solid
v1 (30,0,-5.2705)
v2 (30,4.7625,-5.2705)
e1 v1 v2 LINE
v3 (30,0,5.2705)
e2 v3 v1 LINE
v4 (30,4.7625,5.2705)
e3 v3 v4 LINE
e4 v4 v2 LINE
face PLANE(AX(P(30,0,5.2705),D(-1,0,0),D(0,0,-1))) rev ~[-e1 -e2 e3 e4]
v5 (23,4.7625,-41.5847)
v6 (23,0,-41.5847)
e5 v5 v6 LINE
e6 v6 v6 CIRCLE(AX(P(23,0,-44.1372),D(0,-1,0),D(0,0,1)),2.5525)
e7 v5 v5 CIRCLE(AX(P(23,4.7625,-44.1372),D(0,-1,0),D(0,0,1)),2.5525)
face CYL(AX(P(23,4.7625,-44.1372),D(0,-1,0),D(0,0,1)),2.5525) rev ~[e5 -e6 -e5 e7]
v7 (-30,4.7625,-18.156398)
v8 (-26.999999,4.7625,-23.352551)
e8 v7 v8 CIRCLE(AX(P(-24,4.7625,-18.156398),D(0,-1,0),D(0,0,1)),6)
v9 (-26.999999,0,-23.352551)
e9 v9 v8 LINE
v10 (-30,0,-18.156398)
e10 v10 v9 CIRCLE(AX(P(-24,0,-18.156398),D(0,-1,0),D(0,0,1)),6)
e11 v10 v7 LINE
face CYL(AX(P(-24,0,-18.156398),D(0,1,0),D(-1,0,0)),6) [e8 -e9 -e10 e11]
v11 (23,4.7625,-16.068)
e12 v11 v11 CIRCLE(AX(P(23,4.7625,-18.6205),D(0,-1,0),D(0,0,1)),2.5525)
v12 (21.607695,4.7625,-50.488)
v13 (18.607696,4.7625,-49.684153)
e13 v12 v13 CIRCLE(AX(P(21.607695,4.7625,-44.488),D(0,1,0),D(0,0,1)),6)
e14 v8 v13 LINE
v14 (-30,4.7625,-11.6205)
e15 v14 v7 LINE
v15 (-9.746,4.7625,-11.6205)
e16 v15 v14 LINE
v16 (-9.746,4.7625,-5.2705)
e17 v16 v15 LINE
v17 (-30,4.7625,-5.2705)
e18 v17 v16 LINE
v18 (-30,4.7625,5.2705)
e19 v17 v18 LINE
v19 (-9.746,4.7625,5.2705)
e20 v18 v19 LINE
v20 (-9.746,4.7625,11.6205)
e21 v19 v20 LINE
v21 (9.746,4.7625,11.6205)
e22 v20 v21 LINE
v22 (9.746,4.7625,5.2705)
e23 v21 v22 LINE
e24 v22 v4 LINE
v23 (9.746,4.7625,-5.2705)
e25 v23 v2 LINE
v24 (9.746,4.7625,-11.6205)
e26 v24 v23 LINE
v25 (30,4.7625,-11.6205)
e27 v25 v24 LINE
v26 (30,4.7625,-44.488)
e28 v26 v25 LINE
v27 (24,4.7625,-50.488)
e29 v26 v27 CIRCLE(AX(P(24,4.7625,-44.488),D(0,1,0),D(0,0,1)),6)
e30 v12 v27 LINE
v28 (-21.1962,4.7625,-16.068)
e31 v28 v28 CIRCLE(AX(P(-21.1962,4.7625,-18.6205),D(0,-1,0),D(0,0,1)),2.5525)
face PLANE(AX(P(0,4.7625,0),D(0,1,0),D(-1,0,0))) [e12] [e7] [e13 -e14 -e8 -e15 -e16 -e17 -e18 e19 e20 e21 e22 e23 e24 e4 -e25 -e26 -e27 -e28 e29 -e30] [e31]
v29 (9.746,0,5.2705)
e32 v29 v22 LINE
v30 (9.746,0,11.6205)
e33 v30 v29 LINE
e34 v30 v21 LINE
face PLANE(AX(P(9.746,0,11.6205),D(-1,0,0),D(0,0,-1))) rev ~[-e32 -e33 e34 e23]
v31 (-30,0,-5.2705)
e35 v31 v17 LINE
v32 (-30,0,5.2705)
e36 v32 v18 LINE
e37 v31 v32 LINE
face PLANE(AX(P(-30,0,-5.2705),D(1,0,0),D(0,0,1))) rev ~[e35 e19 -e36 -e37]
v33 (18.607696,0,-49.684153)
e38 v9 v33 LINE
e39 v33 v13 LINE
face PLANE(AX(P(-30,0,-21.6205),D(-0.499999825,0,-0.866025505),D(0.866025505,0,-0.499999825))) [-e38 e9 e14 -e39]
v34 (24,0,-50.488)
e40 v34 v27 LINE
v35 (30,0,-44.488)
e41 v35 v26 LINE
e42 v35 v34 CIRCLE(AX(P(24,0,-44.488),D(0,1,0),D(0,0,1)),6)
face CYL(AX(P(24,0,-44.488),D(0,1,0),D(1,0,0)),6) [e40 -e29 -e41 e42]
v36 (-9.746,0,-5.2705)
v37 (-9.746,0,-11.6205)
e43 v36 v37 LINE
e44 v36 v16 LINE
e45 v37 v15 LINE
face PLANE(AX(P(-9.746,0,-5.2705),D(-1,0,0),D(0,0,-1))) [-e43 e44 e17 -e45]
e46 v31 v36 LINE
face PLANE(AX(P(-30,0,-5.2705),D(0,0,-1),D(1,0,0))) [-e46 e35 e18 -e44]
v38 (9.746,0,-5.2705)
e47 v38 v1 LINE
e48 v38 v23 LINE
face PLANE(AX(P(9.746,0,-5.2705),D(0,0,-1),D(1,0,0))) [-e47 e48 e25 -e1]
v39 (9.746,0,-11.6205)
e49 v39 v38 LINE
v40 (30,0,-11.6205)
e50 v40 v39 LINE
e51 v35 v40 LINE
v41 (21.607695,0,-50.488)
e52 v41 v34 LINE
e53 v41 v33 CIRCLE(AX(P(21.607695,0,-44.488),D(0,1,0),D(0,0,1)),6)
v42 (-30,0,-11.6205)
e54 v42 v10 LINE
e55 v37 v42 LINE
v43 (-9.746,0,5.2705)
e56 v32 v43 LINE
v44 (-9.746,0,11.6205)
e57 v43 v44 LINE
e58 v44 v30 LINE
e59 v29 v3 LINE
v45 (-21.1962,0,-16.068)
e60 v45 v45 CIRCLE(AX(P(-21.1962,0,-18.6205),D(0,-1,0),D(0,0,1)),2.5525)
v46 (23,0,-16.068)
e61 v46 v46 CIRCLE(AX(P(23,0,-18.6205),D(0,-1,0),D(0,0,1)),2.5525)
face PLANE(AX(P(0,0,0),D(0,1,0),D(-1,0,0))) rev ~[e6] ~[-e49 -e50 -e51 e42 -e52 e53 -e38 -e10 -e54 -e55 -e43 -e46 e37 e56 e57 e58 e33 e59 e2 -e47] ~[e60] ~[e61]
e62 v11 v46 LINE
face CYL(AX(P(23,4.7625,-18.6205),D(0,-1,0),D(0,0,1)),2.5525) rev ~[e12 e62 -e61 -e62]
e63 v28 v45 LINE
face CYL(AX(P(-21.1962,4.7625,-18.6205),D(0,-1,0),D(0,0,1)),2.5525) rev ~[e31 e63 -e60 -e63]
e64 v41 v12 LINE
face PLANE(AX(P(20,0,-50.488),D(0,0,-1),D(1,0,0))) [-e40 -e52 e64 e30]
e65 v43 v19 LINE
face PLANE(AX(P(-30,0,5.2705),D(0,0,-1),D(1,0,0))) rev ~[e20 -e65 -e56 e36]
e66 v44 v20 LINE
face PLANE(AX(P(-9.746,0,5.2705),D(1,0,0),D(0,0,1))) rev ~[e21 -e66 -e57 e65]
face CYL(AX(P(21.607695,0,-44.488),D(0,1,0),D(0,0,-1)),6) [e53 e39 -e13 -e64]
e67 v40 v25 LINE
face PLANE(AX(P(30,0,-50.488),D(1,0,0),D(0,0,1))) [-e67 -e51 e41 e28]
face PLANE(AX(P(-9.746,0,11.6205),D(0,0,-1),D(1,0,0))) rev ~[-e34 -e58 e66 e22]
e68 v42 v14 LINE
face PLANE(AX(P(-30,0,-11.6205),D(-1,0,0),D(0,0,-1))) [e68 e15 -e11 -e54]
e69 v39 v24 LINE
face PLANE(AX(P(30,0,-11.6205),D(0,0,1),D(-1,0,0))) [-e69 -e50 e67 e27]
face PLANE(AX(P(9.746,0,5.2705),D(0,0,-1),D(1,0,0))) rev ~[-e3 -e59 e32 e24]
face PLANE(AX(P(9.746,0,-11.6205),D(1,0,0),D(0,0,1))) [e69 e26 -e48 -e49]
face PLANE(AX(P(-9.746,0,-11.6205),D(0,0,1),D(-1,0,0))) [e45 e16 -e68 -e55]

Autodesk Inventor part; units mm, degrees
ref_plane "YZ Plane" through (0, 0, 0) normal (1, 0, 0) x (0, 1, 0)
ref_plane "XZ Plane" through (0, 0, 0) normal (0, 1, 0) x (-1, 0, 0)
ref_plane "XY Plane" through (0, 0, 0) normal (0, 0, 1) x (1, 0, 0)
sketch "Sketch1" plane through (0, 0, 0) normal (0, 1, 0) x (-1, 0, 0)
  line L0 (-30, -11.6205) -> (30, -11.6205)
  line L1 (30, -11.6205) -> (30, 11.6205)
  line L2 (30, 11.6205) -> (-30, 11.6205)
  line L3 (-30, 11.6205) -> (-30, -11.6205)
  line L4 (-30, -11.6205) -> (30, 11.6205) construction
  line L5 (30, -11.6205) -> (-30, 11.6205) construction
  line L6 (-9.746, 11.6205) -> (-9.746, 5.2705)
  line L7 (-9.746, 5.2705) -> (-30, 5.2705)
  line L8 (30, 5.2705) -> (9.746, 5.2705)
  line L9 (9.746, 5.2705) -> (9.746, 11.6205)
  line L10 (30, 0) -> (0, 0) construction
  line L11 (-9.746, -11.6205) -> (-9.746, -5.2705)
  line L12 (-9.746, -5.2705) -> (-30, -5.2705)
  line L13 (30, -5.2705) -> (9.746, -5.2705)
  line L14 (9.746, -5.2705) -> (9.746, -11.6205)
  line L15 (30, -11.6205) -> (30, -21.6205)
  line L16 (30, -21.6205) -> (-20, -50.488)
  line L17 (-20, -50.488) -> (-30, -50.488)
  line L18 (-30, -50.488) -> (-30, -11.6205)
  dimension "d0" = 20.254
  dimension "d1" = 20.254
  dimension "d2" = 6.35
  dimension "d3" = 60
  dimension "d4" = 23.241
  dimension "d5" = 10
  dimension "d6" = 10
  dimension "d7" = 60
extrude "Plate1" add sketch "Sketch1" along normal blind 4.7625 contours L0 L15 L16 L17 L18 | L11 L12 L3 L7 L6 L2 L9 L8 L1 L13 L14 L0
fillet "Corner Round1" radius 6 3 edges at (-30, 2.3813, -21.6205) (20, 2.3813, -50.488) (30, 2.3813, -50.488)
sketch "Sketch2" plane through (0, 4.7625, 0) normal (0, 1, 0) x (1, 0, 0)
  line L0 (-21.1962, 18.6205) -> (23, 18.6205)
  line L1 (23, 18.6205) -> (23, 44.1372)
  line L2 (23, 44.1372) -> (-21.1962, 18.6205)
  line L3 (-27, 23.3526) -> (18.6077, 49.6842) projected
  line L4 (-9.746, 11.6205) -> (-30, 11.6205) projected
  line L5 (30, 44.488) -> (30, 11.6205) projected
  point P0 (0, 0)
  dimension "d10" = 7
  dimension "d11" = 7
  dimension "d12" = 7
hole "Hole1" at (-21.1962, 4.7625, -18.6205) at (23, 4.7625, -18.6205) at (23, 4.7625, -44.1372) direction (0, -1, 0) diameter 5.105 end through all clearance for "Socket Head Cap Screw" size "#10" standard "Ansi Unified Screw Threads"
equation "\"d1\" = d0"
equation "\"d6\" = d5"
equation "\"d11\" = d10"
equation "\"d12\" = d10"
equation "\"d18\" = Thickness"
equation "\"d8\" = Thickness"
equation "\"BendRadius\" = Thickness"
equation "\"BendReliefWidth\" = Thickness"
equation "\"BendReliefDepth\" = 0.5 * Thickness"
equation "\"CornerReliefSize\" = 4 * Thickness"
equation "\"MinimumRemnant\" = 2 * Thickness"
equation "\"TransitionRadius\" = BendRadius"
equation "\"JacobiRadiusSize\" = BendRadius"
equation "\"GapSize\" = Thickness"
equation "\"Thickness\" = 4.7625"
properties part number "INTAKE_BACK_MOUNT_PLATE" material "Aluminum, 6061-T6"
